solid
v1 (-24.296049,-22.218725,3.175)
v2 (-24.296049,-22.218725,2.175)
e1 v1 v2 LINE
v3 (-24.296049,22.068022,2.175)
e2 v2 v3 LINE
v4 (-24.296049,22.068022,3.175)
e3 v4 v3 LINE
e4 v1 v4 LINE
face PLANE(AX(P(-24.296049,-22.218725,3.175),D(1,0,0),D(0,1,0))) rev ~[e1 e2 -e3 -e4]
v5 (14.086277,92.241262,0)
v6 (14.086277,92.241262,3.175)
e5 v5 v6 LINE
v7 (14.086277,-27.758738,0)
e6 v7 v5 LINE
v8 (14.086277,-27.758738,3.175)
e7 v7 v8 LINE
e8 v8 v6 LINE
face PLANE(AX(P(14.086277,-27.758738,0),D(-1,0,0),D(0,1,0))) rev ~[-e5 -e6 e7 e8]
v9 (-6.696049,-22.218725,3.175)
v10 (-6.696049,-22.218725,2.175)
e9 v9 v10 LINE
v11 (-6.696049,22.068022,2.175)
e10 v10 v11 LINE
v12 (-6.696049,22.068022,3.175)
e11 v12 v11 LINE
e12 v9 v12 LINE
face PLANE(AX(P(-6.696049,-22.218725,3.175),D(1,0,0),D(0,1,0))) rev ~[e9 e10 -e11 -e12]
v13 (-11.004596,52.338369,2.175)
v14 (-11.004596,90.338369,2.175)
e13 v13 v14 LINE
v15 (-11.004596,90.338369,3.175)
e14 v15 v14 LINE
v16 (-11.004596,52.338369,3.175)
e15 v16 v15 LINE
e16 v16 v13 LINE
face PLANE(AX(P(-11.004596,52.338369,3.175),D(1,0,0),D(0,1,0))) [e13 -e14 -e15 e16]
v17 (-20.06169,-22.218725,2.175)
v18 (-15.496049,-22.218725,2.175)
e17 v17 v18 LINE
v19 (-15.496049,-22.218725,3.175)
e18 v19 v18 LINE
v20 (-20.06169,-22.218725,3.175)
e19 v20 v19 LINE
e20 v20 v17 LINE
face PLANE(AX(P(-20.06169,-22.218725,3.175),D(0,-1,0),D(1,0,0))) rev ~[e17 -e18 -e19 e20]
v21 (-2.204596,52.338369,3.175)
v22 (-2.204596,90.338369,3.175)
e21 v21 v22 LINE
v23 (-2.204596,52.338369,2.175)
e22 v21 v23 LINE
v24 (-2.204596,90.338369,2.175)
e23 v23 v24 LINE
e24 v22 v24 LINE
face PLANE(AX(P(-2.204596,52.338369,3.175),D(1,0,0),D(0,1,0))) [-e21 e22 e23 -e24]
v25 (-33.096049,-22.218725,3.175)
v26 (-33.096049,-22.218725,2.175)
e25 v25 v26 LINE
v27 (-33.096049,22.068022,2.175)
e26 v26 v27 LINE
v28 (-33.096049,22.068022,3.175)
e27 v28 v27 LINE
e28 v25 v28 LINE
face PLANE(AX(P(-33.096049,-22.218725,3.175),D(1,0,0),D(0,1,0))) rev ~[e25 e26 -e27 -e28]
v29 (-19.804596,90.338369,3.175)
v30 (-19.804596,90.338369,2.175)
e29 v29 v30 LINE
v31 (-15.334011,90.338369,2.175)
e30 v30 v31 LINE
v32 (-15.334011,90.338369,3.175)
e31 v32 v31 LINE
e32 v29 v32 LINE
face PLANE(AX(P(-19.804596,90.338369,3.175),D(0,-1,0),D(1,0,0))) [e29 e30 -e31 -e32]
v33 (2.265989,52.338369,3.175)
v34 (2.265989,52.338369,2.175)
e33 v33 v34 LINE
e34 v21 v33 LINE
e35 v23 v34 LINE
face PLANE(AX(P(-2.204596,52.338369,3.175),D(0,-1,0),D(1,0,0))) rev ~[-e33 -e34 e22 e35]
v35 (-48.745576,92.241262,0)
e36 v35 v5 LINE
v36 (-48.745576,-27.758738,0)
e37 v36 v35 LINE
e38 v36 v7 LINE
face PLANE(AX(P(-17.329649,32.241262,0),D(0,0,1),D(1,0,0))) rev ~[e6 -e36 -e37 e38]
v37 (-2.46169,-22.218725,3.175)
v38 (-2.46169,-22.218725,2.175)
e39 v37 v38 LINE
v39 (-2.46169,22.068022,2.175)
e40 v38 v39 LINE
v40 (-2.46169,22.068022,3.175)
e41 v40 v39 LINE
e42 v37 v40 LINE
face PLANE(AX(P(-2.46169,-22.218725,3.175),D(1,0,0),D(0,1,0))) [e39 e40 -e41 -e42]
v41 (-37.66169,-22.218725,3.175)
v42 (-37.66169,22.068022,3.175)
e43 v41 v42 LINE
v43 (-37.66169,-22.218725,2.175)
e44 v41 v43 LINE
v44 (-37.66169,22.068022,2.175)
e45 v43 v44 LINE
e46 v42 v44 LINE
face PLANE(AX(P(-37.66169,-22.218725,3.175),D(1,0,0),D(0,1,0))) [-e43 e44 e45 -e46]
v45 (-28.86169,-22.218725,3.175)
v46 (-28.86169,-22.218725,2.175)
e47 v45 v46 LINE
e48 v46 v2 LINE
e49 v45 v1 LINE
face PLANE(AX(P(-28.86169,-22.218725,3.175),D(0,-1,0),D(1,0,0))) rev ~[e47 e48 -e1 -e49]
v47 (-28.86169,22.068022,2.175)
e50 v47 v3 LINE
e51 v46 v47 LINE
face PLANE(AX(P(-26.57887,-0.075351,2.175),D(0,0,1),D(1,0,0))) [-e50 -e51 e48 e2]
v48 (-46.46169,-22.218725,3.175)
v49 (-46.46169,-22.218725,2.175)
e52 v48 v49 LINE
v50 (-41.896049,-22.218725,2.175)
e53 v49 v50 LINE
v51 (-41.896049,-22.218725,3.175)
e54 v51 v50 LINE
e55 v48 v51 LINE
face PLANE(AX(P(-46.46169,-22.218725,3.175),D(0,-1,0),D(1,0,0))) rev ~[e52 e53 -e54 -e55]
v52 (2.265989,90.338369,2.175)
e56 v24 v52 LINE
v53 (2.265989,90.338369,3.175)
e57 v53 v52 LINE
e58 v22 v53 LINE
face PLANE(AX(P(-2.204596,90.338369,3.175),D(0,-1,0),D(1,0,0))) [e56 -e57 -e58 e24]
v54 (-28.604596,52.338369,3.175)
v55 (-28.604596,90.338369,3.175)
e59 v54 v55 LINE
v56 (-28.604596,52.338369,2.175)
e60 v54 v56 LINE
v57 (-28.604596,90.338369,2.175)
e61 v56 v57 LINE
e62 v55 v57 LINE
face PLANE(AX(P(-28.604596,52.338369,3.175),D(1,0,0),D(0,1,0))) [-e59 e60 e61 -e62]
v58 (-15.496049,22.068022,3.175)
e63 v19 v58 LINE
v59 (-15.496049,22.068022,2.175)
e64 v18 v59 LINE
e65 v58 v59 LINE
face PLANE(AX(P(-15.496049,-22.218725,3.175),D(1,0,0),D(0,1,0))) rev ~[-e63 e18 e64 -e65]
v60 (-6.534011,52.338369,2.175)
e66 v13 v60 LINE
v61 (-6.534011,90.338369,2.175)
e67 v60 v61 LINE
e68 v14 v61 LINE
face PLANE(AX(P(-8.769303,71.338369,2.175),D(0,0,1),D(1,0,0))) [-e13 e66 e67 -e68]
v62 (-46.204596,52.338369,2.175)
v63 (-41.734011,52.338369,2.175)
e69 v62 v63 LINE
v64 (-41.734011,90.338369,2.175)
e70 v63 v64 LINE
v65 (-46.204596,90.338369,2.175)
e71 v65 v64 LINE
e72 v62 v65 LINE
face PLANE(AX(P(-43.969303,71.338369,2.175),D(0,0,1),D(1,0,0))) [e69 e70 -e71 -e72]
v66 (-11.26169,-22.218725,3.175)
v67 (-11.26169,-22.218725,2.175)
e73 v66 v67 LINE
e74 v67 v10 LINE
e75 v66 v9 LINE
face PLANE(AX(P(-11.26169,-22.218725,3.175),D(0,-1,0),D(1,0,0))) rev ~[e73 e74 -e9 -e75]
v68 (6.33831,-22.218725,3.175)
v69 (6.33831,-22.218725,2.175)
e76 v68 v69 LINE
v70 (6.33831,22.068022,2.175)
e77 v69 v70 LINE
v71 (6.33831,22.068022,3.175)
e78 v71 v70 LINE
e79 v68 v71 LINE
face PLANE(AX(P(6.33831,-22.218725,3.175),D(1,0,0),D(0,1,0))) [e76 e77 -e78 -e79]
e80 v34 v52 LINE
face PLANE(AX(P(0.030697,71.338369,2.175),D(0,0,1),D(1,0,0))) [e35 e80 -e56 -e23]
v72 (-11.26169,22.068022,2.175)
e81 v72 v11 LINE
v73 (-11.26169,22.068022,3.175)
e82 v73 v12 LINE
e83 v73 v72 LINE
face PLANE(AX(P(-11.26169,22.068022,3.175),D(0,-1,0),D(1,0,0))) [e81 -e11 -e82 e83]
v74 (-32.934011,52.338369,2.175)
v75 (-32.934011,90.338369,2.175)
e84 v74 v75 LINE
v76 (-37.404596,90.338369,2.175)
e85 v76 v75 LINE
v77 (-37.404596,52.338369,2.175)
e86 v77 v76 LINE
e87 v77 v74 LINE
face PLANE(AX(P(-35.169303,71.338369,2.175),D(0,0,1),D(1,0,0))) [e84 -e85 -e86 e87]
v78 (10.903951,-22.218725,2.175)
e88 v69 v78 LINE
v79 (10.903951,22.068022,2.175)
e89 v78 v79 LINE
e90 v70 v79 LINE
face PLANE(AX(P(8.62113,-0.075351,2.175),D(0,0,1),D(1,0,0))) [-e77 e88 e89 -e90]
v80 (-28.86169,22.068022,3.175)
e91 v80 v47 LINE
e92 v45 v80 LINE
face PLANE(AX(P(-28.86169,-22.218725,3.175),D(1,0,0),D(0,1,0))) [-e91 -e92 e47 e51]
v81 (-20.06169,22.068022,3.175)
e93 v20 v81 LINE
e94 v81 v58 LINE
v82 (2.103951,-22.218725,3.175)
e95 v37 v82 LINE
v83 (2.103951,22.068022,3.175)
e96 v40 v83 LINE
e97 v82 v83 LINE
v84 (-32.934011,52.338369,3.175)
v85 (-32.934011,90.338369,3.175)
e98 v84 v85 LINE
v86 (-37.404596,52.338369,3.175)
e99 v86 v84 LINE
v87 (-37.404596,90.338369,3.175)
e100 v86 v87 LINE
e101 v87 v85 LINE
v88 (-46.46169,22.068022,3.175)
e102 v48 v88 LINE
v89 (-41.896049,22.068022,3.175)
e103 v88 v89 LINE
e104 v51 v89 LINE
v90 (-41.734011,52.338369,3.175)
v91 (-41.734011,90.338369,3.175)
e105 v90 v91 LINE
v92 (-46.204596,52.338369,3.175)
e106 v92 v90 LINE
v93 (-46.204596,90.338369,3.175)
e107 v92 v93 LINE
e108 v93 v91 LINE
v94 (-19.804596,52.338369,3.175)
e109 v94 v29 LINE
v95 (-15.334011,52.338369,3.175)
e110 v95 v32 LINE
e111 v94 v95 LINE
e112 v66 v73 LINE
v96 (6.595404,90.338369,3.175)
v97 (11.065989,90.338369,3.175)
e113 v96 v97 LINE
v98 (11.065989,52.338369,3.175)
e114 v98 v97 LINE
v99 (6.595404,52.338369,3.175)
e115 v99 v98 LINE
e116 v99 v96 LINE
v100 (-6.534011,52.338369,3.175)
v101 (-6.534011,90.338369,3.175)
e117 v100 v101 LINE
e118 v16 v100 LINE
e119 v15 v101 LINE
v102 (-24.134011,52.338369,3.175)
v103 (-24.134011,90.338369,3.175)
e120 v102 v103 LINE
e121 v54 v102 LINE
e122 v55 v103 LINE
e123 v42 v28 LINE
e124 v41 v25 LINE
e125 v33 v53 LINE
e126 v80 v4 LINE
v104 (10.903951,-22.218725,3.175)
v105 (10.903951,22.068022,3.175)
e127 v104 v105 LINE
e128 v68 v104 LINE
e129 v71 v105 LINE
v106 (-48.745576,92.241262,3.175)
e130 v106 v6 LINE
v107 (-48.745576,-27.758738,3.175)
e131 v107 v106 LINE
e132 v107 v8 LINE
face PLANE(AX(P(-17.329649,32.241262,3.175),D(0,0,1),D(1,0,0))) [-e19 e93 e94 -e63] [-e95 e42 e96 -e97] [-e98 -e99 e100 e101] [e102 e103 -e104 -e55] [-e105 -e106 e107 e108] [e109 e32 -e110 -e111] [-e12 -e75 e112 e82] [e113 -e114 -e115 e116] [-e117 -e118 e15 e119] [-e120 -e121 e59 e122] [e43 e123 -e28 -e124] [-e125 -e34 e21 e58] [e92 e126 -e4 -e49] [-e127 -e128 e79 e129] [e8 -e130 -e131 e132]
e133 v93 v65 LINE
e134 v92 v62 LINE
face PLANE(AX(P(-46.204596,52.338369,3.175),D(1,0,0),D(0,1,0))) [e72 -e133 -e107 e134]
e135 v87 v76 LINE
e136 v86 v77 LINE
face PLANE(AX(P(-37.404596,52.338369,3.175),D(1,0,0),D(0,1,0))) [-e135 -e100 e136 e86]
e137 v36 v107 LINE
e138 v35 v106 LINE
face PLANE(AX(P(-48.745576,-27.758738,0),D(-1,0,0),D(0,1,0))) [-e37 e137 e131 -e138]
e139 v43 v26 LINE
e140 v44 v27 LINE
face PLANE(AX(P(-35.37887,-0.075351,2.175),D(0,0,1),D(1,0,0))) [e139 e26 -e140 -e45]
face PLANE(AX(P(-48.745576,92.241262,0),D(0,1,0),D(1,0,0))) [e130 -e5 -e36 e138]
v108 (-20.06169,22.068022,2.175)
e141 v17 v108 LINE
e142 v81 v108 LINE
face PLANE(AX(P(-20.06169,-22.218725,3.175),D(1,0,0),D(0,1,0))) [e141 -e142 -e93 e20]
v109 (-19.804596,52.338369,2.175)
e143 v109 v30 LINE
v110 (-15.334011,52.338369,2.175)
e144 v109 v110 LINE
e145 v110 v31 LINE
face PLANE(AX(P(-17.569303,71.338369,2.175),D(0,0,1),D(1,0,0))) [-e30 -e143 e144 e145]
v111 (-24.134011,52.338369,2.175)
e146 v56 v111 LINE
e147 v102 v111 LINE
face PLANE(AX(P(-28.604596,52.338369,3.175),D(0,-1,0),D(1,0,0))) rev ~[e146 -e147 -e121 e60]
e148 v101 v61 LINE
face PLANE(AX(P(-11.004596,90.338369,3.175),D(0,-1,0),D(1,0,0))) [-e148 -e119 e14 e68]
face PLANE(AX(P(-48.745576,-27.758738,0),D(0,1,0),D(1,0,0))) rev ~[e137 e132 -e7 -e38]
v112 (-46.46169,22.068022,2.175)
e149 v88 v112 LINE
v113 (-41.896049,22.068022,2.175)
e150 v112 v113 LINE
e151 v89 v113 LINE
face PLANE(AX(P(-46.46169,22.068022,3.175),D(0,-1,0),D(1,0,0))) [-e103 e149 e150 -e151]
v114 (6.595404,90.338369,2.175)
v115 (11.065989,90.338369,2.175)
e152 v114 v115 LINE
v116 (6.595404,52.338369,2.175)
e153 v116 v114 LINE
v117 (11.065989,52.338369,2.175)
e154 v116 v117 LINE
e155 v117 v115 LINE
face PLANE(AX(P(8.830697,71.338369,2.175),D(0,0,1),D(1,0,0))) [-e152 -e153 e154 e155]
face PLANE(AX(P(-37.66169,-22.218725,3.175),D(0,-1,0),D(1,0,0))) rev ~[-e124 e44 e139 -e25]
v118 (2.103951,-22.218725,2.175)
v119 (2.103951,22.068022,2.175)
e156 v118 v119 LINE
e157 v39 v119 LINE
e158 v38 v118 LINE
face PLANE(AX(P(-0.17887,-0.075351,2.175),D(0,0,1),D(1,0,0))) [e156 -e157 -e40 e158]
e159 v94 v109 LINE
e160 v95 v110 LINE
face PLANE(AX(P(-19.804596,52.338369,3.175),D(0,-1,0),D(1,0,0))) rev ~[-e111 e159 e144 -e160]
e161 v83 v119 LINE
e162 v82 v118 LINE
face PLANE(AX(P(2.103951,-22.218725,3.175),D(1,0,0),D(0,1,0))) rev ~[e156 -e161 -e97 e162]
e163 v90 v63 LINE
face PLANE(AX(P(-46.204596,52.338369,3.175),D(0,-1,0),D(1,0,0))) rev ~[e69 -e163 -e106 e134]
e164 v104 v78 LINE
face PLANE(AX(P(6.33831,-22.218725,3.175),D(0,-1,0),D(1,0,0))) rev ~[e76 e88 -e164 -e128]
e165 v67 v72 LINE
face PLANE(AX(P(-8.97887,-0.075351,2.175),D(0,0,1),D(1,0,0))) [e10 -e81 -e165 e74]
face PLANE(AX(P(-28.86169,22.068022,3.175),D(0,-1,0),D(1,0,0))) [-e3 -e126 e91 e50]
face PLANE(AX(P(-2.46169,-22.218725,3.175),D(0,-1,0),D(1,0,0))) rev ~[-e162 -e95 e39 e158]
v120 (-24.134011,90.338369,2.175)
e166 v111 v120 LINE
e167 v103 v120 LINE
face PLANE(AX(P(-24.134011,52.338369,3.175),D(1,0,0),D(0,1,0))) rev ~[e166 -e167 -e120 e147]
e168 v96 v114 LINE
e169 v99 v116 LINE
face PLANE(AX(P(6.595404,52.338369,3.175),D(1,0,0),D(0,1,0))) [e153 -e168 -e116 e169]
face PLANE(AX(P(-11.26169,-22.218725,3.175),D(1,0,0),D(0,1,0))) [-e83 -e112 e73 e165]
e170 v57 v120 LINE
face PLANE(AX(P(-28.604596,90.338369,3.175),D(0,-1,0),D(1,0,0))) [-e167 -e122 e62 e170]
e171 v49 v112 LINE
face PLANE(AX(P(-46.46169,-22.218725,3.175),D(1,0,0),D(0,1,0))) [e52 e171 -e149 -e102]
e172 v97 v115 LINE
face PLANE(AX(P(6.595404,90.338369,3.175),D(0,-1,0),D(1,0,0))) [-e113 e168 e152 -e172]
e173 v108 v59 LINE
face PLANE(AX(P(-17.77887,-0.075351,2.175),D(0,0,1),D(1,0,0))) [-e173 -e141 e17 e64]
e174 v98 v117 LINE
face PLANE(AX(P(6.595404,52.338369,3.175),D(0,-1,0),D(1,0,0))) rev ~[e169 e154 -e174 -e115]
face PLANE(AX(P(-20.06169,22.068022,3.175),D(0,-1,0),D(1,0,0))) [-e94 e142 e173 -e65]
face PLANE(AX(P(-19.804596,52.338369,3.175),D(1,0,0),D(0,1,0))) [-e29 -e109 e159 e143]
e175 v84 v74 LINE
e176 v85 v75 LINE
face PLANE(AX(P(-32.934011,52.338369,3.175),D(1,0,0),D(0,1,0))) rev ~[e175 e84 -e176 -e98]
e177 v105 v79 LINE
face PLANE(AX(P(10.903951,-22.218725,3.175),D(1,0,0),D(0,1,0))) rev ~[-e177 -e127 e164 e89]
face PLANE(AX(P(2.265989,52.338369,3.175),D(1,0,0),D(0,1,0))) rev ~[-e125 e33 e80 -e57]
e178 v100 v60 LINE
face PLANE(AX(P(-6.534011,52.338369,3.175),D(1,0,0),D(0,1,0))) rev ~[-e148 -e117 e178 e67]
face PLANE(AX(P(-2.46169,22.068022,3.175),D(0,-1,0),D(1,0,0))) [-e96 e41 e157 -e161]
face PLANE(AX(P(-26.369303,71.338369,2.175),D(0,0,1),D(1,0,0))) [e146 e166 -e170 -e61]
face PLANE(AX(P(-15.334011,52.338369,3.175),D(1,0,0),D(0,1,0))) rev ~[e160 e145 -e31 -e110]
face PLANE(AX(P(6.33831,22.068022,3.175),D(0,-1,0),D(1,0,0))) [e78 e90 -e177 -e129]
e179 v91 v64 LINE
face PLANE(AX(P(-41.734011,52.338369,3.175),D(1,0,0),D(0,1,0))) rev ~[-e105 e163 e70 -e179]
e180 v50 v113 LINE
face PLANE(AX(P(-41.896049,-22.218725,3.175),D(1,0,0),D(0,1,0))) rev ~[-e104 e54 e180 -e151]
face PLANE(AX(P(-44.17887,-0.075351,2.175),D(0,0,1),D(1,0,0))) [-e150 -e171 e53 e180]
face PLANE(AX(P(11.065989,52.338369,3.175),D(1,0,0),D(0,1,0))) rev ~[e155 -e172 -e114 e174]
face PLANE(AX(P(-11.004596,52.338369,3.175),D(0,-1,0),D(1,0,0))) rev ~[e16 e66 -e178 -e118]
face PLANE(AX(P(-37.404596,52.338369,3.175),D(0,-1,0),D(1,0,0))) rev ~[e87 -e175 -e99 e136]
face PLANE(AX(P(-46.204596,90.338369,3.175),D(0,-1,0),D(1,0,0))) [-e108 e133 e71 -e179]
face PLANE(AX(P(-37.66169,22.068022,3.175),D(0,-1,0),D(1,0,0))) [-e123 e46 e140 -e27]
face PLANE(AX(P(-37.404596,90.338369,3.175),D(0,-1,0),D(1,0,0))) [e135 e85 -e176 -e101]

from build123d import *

# Parameters (mm, degrees)
F0_W     = 62.8318530718
F0_H     = 120
F1_DEPTH = 3.175
F2_W     = 4.4705853476
F2_H     = 38
F3_W     = 4.4705853476
F3_H     = 38
F3_W_2   = 4.565641284
F3_H_2   = 44.2867465317
F4_DEPTH = 1


# Not quite as in the source:
# - a length typed as a fraction of an inch, garbled in the dataset ("3 / 203.2 mm" for 3/8 in), is restored


with BuildPart() as f1:
    # F0 (on Top) → F1 (new body)
    with BuildSketch(Plane.XY):
        with Locations((-17.3296490684, 32.2412615943)):
            Rectangle(F0_W, F0_H)
    extrude(amount=F1_DEPTH)

    # F2 (on face) + F3 (on face) → F4 (cut)
    with BuildSketch(Plane.XY.offset(3.175)):
        with Locations((-26.3693033695, 71.3383685797)):
            Rectangle(F2_W, F2_H)
        with Locations((-43.9693033695, 71.3383685797)):
            Rectangle(F2_W, F2_H)
        with Locations((-35.1693033695, 71.3383685797)):
            Rectangle(F2_W, F2_H)
        with Locations((-8.7693033695, 71.3383685797)):
            Rectangle(F2_W, F2_H)
        with Locations((0.0306966305, 71.3383685797)):
            Rectangle(F2_W, F2_H)
        with Locations((8.8306966305, 71.3383685797)):
            Rectangle(F2_W, F2_H)
    with BuildSketch(Plane.XY.offset(3.175)):
        with Locations((-17.5693033695, 71.3383685797)):
            Rectangle(F3_W, F3_H)
        with Locations((-0.1788695753, -0.0753514469)):
            Rectangle(F3_W_2, F3_H_2)
        with Locations((-8.9788695753, -0.0753514469)):
            Rectangle(F3_W_2, F3_H_2)
        with Locations((-17.7788695753, -0.0753514469)):
            Rectangle(F3_W_2, F3_H_2)
        with Locations((-26.5788695753, -0.0753514469)):
            Rectangle(F3_W_2, F3_H_2)
        with Locations((-35.3788695753, -0.0753514469)):
            Rectangle(F3_W_2, F3_H_2)
        with Locations((-44.1788695753, -0.0753514469)):
            Rectangle(F3_W_2, F3_H_2)
        with Locations((8.6211304247, -0.0753514469)):
            Rectangle(F3_W_2, F3_H_2)
    extrude(amount=-F4_DEPTH, mode=Mode.SUBTRACT)


solid = f1.part
